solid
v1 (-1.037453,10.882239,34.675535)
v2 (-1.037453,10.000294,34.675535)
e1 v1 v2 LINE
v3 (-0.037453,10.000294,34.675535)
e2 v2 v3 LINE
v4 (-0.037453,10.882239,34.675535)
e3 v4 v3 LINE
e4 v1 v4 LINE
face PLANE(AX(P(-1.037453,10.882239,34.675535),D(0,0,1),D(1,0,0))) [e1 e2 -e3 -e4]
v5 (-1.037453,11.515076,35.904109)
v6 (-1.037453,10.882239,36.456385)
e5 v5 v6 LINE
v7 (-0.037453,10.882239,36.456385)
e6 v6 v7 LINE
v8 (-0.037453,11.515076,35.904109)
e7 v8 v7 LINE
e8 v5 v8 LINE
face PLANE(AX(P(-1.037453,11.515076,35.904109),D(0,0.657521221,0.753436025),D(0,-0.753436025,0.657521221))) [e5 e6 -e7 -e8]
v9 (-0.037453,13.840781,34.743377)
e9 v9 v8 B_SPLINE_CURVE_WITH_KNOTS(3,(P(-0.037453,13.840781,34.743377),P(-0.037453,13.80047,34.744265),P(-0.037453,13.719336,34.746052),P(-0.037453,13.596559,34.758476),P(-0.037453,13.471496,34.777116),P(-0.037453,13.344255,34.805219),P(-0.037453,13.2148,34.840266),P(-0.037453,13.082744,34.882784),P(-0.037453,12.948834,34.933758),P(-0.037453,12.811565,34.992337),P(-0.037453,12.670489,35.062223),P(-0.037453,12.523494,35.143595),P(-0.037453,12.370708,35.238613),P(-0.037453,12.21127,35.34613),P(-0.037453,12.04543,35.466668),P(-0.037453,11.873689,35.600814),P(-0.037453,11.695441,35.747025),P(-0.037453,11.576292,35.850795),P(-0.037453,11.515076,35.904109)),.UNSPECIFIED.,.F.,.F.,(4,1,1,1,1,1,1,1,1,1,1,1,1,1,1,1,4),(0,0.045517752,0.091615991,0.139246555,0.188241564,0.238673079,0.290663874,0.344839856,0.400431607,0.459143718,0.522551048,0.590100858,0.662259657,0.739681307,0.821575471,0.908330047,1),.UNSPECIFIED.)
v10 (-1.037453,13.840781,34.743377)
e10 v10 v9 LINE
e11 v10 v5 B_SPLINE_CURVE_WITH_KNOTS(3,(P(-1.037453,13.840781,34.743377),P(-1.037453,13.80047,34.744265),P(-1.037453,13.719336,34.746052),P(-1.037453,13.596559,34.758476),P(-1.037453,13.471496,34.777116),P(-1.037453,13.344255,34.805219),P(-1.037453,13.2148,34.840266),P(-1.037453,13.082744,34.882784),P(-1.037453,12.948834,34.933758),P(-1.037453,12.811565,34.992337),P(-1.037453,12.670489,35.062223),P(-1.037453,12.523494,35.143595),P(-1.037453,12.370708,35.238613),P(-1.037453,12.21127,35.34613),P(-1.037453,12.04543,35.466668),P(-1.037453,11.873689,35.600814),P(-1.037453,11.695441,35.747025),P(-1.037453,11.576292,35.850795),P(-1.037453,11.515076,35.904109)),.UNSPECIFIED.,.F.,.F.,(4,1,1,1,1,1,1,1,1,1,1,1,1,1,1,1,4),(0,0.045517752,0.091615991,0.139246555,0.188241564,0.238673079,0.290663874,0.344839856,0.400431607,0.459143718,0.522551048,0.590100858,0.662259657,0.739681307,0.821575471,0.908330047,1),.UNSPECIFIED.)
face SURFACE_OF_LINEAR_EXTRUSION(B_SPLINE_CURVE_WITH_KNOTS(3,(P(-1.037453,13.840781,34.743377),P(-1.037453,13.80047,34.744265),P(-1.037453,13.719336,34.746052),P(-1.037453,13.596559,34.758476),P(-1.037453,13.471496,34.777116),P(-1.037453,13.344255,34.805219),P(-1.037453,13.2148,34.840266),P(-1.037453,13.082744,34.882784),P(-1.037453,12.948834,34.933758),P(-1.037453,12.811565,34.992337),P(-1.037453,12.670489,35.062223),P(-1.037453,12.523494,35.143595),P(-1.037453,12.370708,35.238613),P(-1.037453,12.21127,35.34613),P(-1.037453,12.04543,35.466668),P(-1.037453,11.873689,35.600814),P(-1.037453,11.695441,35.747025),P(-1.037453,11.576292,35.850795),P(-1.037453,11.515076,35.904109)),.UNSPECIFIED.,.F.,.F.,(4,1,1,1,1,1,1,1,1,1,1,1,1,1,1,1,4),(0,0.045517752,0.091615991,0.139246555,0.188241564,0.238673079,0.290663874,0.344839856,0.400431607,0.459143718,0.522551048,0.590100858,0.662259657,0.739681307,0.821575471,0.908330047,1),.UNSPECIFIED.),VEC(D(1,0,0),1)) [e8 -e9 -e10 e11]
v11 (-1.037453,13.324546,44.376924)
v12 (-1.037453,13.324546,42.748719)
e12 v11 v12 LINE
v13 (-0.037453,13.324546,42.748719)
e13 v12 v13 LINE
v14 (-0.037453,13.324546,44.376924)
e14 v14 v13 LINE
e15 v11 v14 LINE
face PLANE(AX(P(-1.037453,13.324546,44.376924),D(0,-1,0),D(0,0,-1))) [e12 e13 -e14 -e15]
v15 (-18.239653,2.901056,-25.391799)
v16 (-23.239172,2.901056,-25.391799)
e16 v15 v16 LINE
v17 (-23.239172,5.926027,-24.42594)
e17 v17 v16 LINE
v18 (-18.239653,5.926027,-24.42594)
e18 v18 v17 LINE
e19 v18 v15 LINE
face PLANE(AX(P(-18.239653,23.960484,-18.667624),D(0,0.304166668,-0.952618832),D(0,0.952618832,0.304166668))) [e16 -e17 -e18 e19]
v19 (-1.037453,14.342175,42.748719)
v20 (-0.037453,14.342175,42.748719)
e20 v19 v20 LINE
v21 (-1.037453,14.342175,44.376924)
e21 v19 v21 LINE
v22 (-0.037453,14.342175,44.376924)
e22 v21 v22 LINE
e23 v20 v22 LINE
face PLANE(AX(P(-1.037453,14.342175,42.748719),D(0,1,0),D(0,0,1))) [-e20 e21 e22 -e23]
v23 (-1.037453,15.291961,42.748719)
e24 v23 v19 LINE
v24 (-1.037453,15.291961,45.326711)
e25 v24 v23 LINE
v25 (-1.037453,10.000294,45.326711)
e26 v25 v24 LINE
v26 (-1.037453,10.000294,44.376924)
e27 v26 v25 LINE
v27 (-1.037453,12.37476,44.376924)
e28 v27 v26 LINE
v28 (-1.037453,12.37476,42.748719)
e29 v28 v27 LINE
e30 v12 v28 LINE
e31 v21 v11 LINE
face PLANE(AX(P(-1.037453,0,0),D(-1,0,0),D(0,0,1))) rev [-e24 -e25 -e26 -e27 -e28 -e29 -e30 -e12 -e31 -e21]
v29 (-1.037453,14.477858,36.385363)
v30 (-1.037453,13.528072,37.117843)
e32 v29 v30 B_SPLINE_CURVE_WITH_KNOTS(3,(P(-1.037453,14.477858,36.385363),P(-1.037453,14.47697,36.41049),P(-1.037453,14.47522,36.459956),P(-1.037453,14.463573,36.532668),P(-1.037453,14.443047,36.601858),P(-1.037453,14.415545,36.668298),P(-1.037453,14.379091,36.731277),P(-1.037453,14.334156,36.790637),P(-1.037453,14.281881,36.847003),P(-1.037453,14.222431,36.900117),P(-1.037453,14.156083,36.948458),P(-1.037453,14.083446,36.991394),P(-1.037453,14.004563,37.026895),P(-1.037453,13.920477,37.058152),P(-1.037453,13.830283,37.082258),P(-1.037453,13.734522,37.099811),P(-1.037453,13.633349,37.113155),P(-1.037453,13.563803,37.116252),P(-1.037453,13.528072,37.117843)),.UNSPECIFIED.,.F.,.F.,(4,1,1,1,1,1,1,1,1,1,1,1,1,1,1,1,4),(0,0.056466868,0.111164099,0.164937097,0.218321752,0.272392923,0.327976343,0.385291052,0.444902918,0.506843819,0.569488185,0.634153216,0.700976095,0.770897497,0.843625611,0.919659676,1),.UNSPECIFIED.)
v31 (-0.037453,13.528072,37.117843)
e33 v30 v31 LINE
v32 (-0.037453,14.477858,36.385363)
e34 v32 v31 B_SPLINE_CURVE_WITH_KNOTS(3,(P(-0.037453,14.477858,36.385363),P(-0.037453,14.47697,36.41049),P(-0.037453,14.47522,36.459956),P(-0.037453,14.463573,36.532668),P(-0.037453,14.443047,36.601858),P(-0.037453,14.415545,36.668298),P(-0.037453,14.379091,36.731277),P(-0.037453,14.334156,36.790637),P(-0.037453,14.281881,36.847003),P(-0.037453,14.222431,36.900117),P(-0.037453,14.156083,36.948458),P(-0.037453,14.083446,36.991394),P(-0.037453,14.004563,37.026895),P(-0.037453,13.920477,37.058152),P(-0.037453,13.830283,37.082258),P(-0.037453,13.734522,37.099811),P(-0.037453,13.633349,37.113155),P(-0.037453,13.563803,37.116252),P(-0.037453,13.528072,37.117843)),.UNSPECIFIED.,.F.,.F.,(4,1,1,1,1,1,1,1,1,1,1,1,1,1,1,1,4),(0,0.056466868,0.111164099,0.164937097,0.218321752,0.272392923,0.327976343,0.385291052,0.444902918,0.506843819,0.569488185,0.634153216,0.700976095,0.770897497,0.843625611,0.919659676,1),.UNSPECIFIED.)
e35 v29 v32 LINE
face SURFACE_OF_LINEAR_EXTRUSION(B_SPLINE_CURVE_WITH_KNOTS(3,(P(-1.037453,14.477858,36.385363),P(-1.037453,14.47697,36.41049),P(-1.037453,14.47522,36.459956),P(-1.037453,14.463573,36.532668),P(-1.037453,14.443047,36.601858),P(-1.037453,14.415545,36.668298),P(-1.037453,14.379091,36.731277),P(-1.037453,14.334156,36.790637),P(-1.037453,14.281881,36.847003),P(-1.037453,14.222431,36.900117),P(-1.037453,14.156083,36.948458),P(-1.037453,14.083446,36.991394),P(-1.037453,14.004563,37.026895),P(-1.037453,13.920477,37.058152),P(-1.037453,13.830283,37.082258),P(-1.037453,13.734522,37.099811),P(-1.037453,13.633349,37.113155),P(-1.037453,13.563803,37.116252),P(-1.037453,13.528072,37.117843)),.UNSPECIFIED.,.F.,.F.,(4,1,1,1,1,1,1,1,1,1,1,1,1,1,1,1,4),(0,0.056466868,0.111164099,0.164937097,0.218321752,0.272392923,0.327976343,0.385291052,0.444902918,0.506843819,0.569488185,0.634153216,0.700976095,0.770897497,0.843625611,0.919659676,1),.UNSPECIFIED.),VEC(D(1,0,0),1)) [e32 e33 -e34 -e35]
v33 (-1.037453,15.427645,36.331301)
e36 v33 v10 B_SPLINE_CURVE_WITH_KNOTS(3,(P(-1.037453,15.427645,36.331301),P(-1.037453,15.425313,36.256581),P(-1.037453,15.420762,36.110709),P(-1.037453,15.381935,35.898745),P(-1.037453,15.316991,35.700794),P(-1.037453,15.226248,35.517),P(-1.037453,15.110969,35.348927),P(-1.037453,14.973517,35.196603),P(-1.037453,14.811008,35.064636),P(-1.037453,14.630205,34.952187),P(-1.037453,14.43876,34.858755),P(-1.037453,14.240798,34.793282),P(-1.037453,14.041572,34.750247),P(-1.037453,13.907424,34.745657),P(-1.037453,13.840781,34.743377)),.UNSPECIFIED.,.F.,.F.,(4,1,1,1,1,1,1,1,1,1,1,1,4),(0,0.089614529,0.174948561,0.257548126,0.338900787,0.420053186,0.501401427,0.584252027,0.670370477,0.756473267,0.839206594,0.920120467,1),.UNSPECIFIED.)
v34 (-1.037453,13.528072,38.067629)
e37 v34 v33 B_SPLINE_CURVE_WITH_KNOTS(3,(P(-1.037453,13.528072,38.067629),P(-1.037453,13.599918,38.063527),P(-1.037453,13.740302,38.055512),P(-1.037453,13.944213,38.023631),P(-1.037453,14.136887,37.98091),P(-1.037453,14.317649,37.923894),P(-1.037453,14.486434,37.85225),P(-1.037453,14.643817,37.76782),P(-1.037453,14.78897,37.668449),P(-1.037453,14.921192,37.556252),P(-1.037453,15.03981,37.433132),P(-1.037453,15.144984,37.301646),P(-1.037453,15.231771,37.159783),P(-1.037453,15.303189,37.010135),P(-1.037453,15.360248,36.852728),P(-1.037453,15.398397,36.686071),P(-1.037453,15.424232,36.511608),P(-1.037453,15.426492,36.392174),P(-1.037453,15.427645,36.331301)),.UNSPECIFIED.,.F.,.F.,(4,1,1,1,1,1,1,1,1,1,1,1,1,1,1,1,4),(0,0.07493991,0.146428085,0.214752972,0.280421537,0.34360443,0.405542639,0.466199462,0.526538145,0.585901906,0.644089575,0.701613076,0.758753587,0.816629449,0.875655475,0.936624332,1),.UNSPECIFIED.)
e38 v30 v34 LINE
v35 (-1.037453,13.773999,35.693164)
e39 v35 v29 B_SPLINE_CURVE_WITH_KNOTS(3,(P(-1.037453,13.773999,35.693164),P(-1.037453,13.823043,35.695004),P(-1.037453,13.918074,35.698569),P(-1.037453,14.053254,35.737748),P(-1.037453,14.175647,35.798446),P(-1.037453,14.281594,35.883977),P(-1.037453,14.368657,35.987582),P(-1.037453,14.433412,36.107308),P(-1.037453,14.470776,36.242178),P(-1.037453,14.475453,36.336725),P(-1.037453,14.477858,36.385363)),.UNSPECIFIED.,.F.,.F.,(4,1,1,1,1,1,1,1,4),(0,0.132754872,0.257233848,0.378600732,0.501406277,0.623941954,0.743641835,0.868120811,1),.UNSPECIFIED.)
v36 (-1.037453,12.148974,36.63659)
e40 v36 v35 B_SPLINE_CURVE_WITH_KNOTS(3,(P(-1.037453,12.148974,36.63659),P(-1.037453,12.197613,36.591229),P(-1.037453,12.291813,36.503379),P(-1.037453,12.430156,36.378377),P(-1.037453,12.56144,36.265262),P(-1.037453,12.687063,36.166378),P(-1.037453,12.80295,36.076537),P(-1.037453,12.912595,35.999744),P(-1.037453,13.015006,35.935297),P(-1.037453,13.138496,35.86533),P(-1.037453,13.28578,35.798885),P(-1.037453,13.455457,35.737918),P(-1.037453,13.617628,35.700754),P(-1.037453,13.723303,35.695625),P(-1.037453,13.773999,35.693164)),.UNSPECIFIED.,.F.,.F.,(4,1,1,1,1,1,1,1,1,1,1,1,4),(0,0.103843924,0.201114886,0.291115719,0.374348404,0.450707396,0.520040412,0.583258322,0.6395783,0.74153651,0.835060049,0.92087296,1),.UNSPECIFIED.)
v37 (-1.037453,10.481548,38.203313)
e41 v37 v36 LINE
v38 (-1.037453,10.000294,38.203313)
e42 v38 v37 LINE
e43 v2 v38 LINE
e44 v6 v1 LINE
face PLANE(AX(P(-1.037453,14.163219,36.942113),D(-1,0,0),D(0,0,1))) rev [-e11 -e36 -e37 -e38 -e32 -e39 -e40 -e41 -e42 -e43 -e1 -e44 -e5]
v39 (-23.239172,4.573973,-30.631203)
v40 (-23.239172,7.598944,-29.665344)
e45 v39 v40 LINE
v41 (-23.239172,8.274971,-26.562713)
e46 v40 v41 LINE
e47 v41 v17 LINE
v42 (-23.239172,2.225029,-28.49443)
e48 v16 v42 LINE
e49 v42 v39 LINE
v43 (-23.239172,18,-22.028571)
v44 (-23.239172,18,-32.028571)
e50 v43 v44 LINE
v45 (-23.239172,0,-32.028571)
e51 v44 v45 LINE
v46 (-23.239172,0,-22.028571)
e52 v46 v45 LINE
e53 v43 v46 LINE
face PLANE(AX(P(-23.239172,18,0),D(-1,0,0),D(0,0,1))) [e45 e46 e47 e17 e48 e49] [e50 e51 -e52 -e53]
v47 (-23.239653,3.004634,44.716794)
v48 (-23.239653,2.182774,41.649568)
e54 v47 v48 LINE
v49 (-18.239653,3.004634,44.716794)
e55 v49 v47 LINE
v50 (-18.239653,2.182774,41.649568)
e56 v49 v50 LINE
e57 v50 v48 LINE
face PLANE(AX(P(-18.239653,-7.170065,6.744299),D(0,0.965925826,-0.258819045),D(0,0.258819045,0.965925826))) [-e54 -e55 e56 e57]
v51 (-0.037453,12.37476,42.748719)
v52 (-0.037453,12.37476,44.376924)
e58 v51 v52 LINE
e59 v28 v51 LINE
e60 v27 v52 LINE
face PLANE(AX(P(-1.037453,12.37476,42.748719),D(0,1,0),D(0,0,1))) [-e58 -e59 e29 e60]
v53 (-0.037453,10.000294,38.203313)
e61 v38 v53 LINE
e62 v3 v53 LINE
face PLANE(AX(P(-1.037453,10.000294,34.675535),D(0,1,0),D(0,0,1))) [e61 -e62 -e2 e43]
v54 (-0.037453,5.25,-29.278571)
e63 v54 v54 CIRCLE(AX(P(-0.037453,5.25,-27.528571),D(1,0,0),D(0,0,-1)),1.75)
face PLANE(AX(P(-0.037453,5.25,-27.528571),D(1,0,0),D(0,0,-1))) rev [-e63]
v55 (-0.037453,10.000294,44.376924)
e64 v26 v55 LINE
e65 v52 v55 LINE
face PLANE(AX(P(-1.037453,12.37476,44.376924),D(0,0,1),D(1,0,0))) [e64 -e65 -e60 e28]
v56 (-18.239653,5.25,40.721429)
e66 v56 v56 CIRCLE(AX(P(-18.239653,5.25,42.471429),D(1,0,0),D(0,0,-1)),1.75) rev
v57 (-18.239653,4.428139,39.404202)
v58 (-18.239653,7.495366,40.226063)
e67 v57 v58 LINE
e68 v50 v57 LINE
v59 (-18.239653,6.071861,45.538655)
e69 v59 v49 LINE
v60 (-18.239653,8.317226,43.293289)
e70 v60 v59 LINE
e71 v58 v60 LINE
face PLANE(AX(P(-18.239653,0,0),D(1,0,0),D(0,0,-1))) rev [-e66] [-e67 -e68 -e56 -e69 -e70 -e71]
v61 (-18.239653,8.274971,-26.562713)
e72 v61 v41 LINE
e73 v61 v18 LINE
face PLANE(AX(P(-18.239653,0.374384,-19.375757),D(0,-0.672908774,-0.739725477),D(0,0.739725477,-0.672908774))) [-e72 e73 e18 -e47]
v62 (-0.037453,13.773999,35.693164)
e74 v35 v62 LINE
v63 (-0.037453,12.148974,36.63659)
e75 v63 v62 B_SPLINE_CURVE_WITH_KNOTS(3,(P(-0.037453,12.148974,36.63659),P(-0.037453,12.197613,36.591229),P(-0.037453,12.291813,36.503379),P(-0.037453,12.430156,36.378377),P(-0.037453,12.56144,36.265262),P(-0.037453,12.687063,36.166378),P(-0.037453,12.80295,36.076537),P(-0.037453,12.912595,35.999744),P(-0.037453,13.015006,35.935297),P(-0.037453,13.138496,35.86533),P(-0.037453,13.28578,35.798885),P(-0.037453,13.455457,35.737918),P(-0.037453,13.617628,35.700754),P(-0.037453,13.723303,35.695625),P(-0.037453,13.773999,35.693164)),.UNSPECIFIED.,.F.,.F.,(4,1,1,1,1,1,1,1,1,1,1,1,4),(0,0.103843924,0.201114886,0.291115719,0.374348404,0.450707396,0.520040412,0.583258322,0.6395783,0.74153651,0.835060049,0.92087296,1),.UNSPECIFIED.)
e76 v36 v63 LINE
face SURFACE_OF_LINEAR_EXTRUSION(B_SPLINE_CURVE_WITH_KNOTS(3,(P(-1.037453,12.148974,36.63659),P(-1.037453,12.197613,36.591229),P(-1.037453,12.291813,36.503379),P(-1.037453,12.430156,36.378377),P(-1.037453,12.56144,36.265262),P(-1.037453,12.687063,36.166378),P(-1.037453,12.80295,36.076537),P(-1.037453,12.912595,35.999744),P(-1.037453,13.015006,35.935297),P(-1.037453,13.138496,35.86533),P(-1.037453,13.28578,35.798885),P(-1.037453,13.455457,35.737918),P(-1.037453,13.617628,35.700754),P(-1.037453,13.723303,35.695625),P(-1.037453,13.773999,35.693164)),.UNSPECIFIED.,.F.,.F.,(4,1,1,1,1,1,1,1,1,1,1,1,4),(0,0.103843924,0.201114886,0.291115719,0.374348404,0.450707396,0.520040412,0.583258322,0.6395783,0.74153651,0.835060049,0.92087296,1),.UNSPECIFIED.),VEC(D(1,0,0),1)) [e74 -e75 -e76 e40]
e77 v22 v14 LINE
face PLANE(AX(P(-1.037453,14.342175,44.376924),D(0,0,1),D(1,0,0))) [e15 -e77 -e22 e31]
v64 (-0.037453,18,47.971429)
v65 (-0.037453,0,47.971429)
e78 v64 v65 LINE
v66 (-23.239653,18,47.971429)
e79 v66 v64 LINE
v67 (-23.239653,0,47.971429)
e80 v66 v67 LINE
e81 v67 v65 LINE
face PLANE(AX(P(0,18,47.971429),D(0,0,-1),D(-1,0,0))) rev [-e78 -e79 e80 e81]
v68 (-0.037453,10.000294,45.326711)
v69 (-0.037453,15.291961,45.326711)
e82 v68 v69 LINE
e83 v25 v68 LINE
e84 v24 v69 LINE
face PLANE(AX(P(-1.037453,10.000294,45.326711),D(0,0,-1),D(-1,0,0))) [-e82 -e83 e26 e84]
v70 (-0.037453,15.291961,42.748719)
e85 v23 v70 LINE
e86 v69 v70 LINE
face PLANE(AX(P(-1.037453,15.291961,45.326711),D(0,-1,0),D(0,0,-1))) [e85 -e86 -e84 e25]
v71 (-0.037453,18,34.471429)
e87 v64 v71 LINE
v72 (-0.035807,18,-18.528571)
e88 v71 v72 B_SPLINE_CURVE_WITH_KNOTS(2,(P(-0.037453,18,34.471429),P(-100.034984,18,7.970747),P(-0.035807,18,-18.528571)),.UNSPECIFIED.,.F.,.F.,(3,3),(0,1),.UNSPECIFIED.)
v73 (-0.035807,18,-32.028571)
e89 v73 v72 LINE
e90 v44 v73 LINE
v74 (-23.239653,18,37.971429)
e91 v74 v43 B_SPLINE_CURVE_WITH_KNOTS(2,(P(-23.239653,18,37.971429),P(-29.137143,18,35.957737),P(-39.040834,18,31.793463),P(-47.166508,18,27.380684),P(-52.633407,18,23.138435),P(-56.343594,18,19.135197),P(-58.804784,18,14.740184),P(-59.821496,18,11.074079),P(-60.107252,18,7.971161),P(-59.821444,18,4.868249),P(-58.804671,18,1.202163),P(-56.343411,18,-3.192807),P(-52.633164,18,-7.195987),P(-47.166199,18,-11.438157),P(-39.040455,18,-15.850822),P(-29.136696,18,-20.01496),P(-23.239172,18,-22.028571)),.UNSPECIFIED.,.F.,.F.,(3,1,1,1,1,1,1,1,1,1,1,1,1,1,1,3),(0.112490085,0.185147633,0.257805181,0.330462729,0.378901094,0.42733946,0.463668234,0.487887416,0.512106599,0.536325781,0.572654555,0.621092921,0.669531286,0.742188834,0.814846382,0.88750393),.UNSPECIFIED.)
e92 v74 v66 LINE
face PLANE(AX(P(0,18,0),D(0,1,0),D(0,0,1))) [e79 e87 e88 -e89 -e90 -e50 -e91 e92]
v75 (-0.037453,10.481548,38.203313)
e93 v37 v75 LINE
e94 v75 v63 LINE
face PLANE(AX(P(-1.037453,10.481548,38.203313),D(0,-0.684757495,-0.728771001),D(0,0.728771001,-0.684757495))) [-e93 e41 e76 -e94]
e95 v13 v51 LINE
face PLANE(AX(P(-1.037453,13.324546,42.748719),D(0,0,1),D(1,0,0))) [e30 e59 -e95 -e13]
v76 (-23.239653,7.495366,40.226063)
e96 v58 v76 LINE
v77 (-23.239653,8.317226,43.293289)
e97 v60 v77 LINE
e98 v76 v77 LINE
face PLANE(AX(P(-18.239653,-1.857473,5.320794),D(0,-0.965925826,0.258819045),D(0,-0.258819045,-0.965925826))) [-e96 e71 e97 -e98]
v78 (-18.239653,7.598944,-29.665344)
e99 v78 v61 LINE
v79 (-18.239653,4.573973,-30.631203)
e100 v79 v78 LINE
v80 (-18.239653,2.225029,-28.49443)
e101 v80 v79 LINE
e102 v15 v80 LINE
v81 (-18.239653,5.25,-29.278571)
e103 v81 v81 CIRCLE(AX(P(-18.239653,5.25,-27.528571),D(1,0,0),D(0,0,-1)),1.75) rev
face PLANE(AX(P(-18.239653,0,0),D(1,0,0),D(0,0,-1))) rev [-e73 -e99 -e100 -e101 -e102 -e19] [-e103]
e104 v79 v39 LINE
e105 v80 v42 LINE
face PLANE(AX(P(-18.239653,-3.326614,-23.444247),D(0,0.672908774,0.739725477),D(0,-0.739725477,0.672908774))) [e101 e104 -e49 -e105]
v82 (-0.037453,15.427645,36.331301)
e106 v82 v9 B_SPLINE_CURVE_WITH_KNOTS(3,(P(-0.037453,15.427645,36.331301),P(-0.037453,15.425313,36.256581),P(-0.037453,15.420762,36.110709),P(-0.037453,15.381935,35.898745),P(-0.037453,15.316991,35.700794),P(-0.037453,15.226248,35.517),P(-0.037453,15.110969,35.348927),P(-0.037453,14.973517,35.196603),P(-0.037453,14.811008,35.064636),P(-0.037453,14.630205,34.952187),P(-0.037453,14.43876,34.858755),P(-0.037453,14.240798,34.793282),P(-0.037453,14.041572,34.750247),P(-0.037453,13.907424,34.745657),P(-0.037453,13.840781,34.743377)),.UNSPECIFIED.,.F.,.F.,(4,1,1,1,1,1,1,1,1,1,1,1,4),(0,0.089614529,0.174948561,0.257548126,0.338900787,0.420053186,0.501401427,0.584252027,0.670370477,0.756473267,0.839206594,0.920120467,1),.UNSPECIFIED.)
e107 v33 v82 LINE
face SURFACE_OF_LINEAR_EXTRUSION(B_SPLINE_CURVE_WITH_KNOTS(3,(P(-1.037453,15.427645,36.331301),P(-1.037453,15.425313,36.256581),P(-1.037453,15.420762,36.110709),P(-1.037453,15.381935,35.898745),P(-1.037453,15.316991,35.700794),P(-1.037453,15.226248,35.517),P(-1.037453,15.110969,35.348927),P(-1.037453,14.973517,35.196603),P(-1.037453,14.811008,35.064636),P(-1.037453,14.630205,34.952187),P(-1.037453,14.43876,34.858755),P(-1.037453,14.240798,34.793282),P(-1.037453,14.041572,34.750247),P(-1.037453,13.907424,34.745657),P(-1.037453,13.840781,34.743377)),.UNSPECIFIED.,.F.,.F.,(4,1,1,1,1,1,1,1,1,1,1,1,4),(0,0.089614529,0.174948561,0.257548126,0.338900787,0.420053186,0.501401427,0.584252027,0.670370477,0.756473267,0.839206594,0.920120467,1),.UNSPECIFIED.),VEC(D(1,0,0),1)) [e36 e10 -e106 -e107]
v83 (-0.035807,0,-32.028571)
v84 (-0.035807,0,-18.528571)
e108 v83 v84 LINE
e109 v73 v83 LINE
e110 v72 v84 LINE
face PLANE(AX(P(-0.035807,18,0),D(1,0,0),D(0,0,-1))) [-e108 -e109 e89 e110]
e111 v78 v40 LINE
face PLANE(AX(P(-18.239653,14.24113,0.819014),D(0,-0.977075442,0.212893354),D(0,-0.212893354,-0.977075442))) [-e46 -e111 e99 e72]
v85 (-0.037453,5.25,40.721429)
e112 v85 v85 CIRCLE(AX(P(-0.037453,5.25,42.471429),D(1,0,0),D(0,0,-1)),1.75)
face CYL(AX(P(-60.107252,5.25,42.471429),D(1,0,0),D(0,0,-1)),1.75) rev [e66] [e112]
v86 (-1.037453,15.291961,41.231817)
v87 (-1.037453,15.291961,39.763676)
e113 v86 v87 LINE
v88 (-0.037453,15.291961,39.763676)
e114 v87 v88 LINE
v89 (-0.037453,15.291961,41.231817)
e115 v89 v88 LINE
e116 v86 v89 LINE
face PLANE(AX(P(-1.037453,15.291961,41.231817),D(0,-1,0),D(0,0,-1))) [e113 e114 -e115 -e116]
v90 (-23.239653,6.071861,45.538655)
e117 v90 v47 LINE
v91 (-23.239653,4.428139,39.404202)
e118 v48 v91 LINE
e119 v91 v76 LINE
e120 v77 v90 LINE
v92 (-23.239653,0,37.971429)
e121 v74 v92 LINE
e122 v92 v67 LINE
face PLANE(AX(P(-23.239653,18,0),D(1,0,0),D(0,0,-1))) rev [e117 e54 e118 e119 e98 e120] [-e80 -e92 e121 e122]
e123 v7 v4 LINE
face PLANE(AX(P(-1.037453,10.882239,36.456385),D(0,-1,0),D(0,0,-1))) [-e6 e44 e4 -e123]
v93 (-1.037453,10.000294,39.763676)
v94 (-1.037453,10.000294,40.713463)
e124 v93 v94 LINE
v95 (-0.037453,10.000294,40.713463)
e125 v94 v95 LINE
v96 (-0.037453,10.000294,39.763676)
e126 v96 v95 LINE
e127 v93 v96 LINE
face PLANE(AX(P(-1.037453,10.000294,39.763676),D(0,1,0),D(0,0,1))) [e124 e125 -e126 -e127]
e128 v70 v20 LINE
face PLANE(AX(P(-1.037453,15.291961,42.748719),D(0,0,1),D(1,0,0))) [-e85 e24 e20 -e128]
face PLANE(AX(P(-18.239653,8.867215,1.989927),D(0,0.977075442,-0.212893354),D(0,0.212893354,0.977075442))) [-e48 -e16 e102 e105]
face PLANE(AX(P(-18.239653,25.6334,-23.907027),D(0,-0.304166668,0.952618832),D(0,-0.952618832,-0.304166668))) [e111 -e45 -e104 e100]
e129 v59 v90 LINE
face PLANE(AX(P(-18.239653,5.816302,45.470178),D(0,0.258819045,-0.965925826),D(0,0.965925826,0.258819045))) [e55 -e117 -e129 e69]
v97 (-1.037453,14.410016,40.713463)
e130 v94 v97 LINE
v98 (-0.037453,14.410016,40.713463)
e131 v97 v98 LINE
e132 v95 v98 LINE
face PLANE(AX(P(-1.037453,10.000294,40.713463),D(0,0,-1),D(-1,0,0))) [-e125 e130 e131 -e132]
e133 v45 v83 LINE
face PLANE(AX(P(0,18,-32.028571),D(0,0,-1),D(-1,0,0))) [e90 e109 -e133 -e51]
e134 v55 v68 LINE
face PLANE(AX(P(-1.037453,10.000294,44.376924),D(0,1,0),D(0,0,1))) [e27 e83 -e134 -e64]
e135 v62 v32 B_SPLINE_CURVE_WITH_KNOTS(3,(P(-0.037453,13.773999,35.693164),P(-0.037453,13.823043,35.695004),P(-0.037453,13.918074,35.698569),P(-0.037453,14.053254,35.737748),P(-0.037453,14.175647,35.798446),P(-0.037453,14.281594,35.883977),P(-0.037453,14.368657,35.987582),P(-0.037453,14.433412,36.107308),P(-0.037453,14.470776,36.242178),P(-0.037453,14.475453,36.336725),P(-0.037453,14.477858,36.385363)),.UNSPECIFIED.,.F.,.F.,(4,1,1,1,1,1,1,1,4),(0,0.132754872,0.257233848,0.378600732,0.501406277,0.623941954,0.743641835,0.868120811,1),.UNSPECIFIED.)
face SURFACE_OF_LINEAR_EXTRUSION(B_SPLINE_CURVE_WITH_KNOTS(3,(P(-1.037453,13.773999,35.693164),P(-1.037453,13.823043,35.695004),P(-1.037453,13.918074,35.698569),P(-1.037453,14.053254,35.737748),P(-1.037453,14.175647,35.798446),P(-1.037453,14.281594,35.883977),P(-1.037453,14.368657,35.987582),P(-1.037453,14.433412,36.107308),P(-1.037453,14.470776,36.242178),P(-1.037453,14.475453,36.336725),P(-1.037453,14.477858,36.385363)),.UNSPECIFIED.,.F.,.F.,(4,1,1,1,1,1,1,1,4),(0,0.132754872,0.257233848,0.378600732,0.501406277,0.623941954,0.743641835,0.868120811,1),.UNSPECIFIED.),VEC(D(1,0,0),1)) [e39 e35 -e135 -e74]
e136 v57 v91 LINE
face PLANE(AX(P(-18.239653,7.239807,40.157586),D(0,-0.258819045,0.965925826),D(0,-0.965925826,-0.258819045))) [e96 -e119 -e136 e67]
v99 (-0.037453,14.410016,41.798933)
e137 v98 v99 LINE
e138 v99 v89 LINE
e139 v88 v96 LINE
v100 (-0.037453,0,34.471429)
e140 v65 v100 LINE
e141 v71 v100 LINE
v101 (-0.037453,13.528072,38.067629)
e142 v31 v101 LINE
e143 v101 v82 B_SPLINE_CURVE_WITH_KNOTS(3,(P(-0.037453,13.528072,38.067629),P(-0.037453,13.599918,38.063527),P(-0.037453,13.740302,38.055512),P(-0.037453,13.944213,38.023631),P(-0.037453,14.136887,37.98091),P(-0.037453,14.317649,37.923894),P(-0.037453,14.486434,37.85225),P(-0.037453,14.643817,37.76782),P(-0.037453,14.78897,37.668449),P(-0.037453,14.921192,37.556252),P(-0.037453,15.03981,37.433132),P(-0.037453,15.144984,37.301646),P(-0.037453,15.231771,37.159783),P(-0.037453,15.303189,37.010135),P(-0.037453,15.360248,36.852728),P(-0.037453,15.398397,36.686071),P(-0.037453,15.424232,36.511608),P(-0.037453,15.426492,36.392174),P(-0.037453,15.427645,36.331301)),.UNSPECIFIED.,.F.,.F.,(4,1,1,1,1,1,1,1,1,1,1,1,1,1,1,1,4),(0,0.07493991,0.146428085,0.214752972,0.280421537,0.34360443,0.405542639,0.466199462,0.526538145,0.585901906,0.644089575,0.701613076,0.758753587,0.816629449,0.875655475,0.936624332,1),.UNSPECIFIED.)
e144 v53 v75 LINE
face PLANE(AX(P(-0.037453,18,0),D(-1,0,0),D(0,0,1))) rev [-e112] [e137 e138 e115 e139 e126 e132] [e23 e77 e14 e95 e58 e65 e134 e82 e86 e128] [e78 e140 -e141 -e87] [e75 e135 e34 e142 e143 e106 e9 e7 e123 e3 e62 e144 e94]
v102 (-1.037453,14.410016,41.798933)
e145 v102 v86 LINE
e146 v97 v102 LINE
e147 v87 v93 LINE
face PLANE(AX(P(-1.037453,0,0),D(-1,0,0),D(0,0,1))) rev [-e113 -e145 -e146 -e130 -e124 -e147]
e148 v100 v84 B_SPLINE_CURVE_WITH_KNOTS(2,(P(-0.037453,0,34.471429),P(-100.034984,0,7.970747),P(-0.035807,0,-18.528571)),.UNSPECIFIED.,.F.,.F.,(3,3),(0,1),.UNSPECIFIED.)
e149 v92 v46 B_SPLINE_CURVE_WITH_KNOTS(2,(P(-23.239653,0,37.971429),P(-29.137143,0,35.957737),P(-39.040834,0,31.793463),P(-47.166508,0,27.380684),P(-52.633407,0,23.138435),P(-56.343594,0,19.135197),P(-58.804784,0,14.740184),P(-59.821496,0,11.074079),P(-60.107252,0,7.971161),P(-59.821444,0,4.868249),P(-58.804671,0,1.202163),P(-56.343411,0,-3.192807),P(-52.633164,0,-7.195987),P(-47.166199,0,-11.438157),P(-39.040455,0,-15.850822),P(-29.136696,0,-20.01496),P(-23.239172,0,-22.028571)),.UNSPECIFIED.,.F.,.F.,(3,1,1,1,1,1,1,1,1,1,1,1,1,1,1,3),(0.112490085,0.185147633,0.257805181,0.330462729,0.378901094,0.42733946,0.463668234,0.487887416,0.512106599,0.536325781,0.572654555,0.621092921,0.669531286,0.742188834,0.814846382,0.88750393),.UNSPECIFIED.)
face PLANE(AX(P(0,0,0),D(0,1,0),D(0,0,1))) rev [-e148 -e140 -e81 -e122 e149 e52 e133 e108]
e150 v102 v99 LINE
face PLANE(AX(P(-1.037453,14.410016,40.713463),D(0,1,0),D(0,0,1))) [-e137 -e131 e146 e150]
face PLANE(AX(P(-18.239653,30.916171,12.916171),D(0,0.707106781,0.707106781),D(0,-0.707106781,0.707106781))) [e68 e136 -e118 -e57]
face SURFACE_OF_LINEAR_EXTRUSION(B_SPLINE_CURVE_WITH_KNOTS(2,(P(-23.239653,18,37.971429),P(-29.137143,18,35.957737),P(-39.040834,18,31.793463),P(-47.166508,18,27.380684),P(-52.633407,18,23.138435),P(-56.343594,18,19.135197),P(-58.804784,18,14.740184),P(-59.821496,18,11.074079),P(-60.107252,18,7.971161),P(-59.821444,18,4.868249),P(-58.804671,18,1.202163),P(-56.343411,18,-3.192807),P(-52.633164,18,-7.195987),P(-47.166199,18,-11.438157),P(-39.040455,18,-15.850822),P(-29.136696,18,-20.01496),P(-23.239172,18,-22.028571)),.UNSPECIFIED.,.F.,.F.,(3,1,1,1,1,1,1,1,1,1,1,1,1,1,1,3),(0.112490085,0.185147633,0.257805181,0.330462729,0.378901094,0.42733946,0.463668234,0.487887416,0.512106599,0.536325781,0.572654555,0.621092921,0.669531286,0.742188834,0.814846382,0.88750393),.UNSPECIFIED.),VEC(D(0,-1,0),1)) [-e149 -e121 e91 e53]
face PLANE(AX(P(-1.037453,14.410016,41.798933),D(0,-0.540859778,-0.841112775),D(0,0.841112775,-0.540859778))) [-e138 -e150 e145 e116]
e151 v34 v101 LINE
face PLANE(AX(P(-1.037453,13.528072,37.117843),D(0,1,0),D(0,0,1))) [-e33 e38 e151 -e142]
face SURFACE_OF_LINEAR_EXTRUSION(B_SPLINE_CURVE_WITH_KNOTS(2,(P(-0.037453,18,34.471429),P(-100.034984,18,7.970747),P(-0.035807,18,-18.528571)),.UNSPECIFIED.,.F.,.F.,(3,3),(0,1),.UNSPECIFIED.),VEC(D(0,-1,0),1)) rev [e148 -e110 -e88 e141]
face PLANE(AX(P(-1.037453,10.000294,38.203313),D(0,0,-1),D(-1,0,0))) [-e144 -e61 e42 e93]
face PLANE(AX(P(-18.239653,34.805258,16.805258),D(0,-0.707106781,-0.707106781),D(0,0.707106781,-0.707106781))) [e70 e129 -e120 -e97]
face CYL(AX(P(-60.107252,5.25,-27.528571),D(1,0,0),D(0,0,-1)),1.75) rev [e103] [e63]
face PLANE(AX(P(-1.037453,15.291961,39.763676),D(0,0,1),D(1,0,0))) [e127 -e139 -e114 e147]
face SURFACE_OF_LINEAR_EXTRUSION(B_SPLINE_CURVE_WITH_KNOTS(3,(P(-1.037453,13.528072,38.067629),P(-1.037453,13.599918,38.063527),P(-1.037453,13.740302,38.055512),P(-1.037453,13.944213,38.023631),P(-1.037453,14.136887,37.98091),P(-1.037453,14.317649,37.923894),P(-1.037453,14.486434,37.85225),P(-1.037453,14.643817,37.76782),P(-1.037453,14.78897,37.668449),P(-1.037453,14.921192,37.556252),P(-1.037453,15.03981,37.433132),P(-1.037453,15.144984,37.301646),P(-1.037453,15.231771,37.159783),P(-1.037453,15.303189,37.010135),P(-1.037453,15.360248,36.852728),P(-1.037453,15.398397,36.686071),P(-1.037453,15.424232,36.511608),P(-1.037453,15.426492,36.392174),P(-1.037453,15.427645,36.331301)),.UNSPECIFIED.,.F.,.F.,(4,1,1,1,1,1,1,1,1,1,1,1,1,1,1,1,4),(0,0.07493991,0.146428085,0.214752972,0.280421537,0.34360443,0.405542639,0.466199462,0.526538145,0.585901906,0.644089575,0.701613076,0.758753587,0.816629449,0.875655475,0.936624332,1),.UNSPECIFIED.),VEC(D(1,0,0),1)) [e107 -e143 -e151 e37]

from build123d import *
from OCP.BRepAlgoAPI import BRepAlgoAPI_Cut
from OCP.TopTools import TopTools_ListOfShape

# Parameters (mm, degrees)
BOSS_EXTRUDE1_DEPTH = 18
SKETCH2_R           = 1.75
CUT_EXTRUDE1_DEPTH  = 79.899052368
CUT_EXTRUDE2_DEPTH  = 1
CUT_EXTRUDE3_START  = -53.96289
CUT_EXTRUDE3_DEPTH  = 5


with BuildPart() as part:
    # Sketch1 → Boss-Extrude1 (new body)
    with BuildSketch(Plane(origin=(0, 0, 0), x_dir=(1, 0, 0), z_dir=(0, 1, 0))):
        with BuildLine():
            Line((-0.035806527, 32.028571429), (-23.239172358, 32.028571429))
            Line((-23.239172358, 32.028571429), (-23.239172358, 22.028571429))
            add(Edge.make_bspline(
                [(-23.239652544, -37.971428571), (-29.137142946, -35.957737039), (-39.04083373, -31.793462695), (-47.16650815, -27.380684298), (-52.63340692, -23.138434647), (-56.343593841, -19.135197292), (-58.804783828, -14.740184146), (-59.821496461, -11.074078946), (-60.10725197, -7.97116121), (-59.821443943, -4.868249056), (-58.804670602, -1.202163133), (-56.343411393, 3.192806984), (-52.633163529, 7.195986519), (-47.166199461, 11.438156728), (-39.040454765, 15.850822153), (-29.136696082, 20.01496049), (-23.239172358, 22.028571429)],
                knots=[0.112490085, 0.112490085, 0.112490085, 0.185147633, 0.257805181, 0.330462729, 0.378901094, 0.42733946, 0.463668234, 0.487887416, 0.512106599, 0.536325781, 0.572654555, 0.621092921, 0.669531286, 0.742188834, 0.814846382, 0.88750393, 0.88750393, 0.88750393], degree=2))
            Line((-23.239652544, -37.971428571), (-23.239652544, -47.971428571))
            Line((-23.239652544, -47.971428571), (-0.037452549, -47.971428571))
            Line((-0.037452549, -47.971428571), (-0.037452549, -34.471428546))
            add(Edge.make_bspline(
                [(-0.037452549, -34.471428546), (-100.034983512, -7.970747495), (-0.035806527, 18.528571429)],
                knots=[0, 0, 0, 1, 1, 1], degree=2))
            Line((-0.035806527, 18.528571429), (-0.035806527, 32.028571429))
        make_face()
    extrude(amount=BOSS_EXTRUDE1_DEPTH)

    # Sketch2 → Cut-Extrude1 (cut, through all)
    with BuildSketch(Plane(origin=(-0.037452549, 0, 0), x_dir=(0, 0, -1), z_dir=(1, 0, 0))):
        with Locations((-42.471428571, 5.25)):
            Circle(SKETCH2_R)
        with Locations((27.528571429, 5.25)):
            Circle(SKETCH2_R)
    extrude(amount=-CUT_EXTRUDE1_DEPTH, mode=Mode.SUBTRACT)

    # Sketch3 → Cut-Extrude2 (cut)
    with BuildSketch(Plane(origin=(-0.037452549, 0, 0), x_dir=(0, 0, -1), z_dir=(1, 0, 0))):
        Polygon((-45.326710591, 15.291960871), (-42.748719138, 15.291960871), (-42.748719138, 14.342174546), (-44.376924266, 14.342174546), (-44.376924266, 13.324546341), (-42.748719138, 13.324546341), (-42.748719138, 12.374760016), (-44.376924266, 12.374760016), (-44.376924266, 10.000294204), (-45.326710591, 10.000294204), align=None)
        Polygon((-41.231817095, 15.291960871), (-39.763676403, 15.291960871), (-39.763676403, 10.000294204), (-40.713462728, 10.000294204), (-40.713462728, 14.410016426), (-41.798932813, 14.410016426), align=None)
        with BuildLine():
            Line((-37.117843069, 13.528071982), (-38.067629394, 13.528071982))
            add(Edge.make_bspline(
                [(-38.067629394, 13.528071982), (-38.063527413, 13.599918293), (-38.055512387, 13.74030167), (-38.023630642, 13.944213021), (-37.980910196, 14.136886824), (-37.923894091, 14.317649087), (-37.852249624, 14.486434125), (-37.767820393, 14.643817335), (-37.668449421, 14.788970093), (-37.55625165, 14.921192389), (-37.43313189, 15.039810231), (-37.301646228, 15.144984262), (-37.159783413, 15.231771225), (-37.010135395, 15.30318886), (-36.852727656, 15.360248233), (-36.686070872, 15.398397041), (-36.511608047, 15.424231787), (-36.392174115, 15.426492431), (-36.331301269, 15.427644632)],
                knots=[0, 0, 0, 0, 1.199038563, 2.342849363, 3.436047546, 4.486744587, 5.497670872, 6.488682221, 7.459191391, 8.424610317, 9.374430501, 10.305433194, 11.225809216, 12.140057399, 13.06607119, 14.010487599, 14.985989317, 16, 16, 16, 16], degree=3))
            add(Edge.make_bspline(
                [(-36.331301269, 15.427644632), (-36.256580714, 15.425313153), (-36.11070868, 15.420761561), (-35.898745044, 15.381934971), (-35.700794183, 15.316991498), (-35.516999989, 15.22624834), (-35.348927135, 15.11096867), (-35.196603491, 14.973516529), (-35.064635567, 14.811008102), (-34.952186649, 14.630205097), (-34.858755036, 14.43876016), (-34.793282054, 14.240798157), (-34.750247368, 14.041572196), (-34.745657452, 13.907423518), (-34.743377257, 13.840780649)],
                knots=[0, 0, 0, 0, 1.075374347, 2.099382735, 3.09057751, 4.06680945, 5.040638231, 6.016817125, 7.011024321, 8.044445721, 9.0776792, 10.070479129, 11.0414456, 12, 12, 12, 12], degree=3))
            add(Edge.make_bspline(
                [(-34.743377257, 13.840780649), (-34.744265045, 13.800470332), (-34.746051942, 13.719335621), (-34.758476474, 13.59655889), (-34.777115727, 13.471496435), (-34.805219179, 13.344255486), (-34.840266487, 13.214800374), (-34.882783937, 13.082743686), (-34.933757764, 12.948834133), (-34.992337317, 12.811564588), (-35.062222873, 12.67048939), (-35.143594888, 12.523493766), (-35.238613161, 12.370708113), (-35.346129991, 12.211269753), (-35.46666756, 12.045430147), (-35.600814295, 11.873688853), (-35.747025138, 11.695440711), (-35.850795087, 11.576291832), (-35.904109429, 11.515076189)],
                knots=[0, 0, 0, 0, 0.728284026, 1.46585585, 2.227944881, 3.01186502, 3.81876927, 4.650621989, 5.517437689, 6.406905708, 7.346299482, 8.360816762, 9.441613733, 10.596154504, 11.834900912, 13.145207542, 14.533280747, 16, 16, 16, 16], degree=3))
            Line((-35.904109429, 11.515076189), (-36.456384736, 10.882238649))
            Line((-36.456384736, 10.882238649), (-34.675535377, 10.882238649))
            Line((-34.675535377, 10.882238649), (-34.675535377, 10.000294204))
            Line((-34.675535377, 10.000294204), (-38.203313155, 10.000294204))
            Line((-38.203313155, 10.000294204), (-38.203313155, 10.481547543))
            Line((-38.203313155, 10.481547543), (-36.636589731, 12.148973758))
            add(Edge.make_bspline(
                [(-36.636589731, 12.148973758), (-36.591229062, 12.197613099), (-36.503378897, 12.291813077), (-36.378377167, 12.430155767), (-36.265261642, 12.561439677), (-36.166377867, 12.687062717), (-36.076536547, 12.802950186), (-35.999743701, 12.912595077), (-35.935296732, 13.015006161), (-35.865330408, 13.138496043), (-35.798885399, 13.285779701), (-35.737918082, 13.455456515), (-35.700754283, 13.617628471), (-35.695624504, 13.723303204), (-35.693163582, 13.773998798)],
                knots=[0, 0, 0, 0, 1.246127091, 2.413378631, 3.493388633, 4.492180848, 5.408488754, 6.240484944, 6.999099869, 7.674939598, 8.898438119, 10.020720584, 11.050475521, 12, 12, 12, 12], degree=3))
            add(Edge.make_bspline(
                [(-35.693163582, 13.773998798), (-35.695003554, 13.823042874), (-35.698568794, 13.918073635), (-35.73774789, 14.053254385), (-35.798445506, 14.175646756), (-35.883977019, 14.281593523), (-35.987582469, 14.368657008), (-36.107308298, 14.433412381), (-36.24217839, 14.470775935), (-36.336724893, 14.475452517), (-36.385362768, 14.477858307)],
                knots=[0, 0, 0, 0, 1.062038974, 2.057870785, 3.028805853, 4.01125022, 4.991535629, 5.949134679, 6.94496649, 8, 8, 8, 8], degree=3))
            add(Edge.make_bspline(
                [(-36.385362768, 14.477858307), (-36.410489713, 14.476969579), (-36.45995614, 14.475219976), (-36.532667922, 14.463573343), (-36.601858406, 14.443047367), (-36.668297721, 14.415545449), (-36.73127681, 14.379091459), (-36.790636819, 14.334156109), (-36.84700318, 14.281881307), (-36.900117375, 14.222430511), (-36.948458227, 14.156083404), (-36.991394395, 14.083445933), (-37.026895457, 14.004563186), (-37.058151883, 13.920476535), (-37.082258335, 13.830282821), (-37.099810822, 13.734521843), (-37.113154806, 13.633349392), (-37.116251886, 13.563802846), (-37.117843069, 13.528071982)],
                knots=[0, 0, 0, 0, 0.903469896, 1.778625579, 2.63899355, 3.493148037, 4.358286772, 5.247621495, 6.164656832, 7.118446693, 8.109501108, 9.111810964, 10.146451449, 11.215617525, 12.33435995, 13.498009769, 14.714554818, 16, 16, 16, 16], degree=3))
        make_face()
    extrude(amount=-CUT_EXTRUDE2_DEPTH, mode=Mode.SUBTRACT)


with BuildPart() as cut_extrude3_tool:
    # Sketch4 → Cut-Extrude3 (new body)
    with BuildSketch(Plane.ZY.offset(77.202542215).offset(CUT_EXTRUDE3_START)):
        Polygon((-25.391799088, 2.901056132), (-24.425940196, 5.926027195), (-26.562712537, 8.274971063), (-29.665343769, 7.598943868), (-30.631202661, 4.573972805), (-28.49443032, 2.225028937), align=None)
        Polygon((44.716794169, 3.004634402), (45.538655018, 6.071860849), (43.293289421, 8.317226447), (40.226062974, 7.495365598), (39.404202124, 4.428139151), (41.649567722, 2.182773553), align=None)
    extrude(amount=-CUT_EXTRUDE3_DEPTH)


with BuildPart() as part_1:
    add(part.part)

    # Cut-Extrude3: cut by cut_extrude3_tool, with a tolerance
    cut_extrude3_stock = TopTools_ListOfShape()
    cut_extrude3_stock.Append(part_1.part.wrapped)
    cut_extrude3_tools = TopTools_ListOfShape()
    cut_extrude3_tools.Append(cut_extrude3_tool.part.wrapped)
    cut_extrude3_cut = BRepAlgoAPI_Cut()
    cut_extrude3_cut.SetArguments(cut_extrude3_stock)
    cut_extrude3_cut.SetTools(cut_extrude3_tools)
    cut_extrude3_cut.SetFuzzyValue(0.00001)
    cut_extrude3_cut.Build()
    add(Compound.cast(cut_extrude3_cut.Shape()).solids(), mode=Mode.REPLACE)


solid = part_1.part
